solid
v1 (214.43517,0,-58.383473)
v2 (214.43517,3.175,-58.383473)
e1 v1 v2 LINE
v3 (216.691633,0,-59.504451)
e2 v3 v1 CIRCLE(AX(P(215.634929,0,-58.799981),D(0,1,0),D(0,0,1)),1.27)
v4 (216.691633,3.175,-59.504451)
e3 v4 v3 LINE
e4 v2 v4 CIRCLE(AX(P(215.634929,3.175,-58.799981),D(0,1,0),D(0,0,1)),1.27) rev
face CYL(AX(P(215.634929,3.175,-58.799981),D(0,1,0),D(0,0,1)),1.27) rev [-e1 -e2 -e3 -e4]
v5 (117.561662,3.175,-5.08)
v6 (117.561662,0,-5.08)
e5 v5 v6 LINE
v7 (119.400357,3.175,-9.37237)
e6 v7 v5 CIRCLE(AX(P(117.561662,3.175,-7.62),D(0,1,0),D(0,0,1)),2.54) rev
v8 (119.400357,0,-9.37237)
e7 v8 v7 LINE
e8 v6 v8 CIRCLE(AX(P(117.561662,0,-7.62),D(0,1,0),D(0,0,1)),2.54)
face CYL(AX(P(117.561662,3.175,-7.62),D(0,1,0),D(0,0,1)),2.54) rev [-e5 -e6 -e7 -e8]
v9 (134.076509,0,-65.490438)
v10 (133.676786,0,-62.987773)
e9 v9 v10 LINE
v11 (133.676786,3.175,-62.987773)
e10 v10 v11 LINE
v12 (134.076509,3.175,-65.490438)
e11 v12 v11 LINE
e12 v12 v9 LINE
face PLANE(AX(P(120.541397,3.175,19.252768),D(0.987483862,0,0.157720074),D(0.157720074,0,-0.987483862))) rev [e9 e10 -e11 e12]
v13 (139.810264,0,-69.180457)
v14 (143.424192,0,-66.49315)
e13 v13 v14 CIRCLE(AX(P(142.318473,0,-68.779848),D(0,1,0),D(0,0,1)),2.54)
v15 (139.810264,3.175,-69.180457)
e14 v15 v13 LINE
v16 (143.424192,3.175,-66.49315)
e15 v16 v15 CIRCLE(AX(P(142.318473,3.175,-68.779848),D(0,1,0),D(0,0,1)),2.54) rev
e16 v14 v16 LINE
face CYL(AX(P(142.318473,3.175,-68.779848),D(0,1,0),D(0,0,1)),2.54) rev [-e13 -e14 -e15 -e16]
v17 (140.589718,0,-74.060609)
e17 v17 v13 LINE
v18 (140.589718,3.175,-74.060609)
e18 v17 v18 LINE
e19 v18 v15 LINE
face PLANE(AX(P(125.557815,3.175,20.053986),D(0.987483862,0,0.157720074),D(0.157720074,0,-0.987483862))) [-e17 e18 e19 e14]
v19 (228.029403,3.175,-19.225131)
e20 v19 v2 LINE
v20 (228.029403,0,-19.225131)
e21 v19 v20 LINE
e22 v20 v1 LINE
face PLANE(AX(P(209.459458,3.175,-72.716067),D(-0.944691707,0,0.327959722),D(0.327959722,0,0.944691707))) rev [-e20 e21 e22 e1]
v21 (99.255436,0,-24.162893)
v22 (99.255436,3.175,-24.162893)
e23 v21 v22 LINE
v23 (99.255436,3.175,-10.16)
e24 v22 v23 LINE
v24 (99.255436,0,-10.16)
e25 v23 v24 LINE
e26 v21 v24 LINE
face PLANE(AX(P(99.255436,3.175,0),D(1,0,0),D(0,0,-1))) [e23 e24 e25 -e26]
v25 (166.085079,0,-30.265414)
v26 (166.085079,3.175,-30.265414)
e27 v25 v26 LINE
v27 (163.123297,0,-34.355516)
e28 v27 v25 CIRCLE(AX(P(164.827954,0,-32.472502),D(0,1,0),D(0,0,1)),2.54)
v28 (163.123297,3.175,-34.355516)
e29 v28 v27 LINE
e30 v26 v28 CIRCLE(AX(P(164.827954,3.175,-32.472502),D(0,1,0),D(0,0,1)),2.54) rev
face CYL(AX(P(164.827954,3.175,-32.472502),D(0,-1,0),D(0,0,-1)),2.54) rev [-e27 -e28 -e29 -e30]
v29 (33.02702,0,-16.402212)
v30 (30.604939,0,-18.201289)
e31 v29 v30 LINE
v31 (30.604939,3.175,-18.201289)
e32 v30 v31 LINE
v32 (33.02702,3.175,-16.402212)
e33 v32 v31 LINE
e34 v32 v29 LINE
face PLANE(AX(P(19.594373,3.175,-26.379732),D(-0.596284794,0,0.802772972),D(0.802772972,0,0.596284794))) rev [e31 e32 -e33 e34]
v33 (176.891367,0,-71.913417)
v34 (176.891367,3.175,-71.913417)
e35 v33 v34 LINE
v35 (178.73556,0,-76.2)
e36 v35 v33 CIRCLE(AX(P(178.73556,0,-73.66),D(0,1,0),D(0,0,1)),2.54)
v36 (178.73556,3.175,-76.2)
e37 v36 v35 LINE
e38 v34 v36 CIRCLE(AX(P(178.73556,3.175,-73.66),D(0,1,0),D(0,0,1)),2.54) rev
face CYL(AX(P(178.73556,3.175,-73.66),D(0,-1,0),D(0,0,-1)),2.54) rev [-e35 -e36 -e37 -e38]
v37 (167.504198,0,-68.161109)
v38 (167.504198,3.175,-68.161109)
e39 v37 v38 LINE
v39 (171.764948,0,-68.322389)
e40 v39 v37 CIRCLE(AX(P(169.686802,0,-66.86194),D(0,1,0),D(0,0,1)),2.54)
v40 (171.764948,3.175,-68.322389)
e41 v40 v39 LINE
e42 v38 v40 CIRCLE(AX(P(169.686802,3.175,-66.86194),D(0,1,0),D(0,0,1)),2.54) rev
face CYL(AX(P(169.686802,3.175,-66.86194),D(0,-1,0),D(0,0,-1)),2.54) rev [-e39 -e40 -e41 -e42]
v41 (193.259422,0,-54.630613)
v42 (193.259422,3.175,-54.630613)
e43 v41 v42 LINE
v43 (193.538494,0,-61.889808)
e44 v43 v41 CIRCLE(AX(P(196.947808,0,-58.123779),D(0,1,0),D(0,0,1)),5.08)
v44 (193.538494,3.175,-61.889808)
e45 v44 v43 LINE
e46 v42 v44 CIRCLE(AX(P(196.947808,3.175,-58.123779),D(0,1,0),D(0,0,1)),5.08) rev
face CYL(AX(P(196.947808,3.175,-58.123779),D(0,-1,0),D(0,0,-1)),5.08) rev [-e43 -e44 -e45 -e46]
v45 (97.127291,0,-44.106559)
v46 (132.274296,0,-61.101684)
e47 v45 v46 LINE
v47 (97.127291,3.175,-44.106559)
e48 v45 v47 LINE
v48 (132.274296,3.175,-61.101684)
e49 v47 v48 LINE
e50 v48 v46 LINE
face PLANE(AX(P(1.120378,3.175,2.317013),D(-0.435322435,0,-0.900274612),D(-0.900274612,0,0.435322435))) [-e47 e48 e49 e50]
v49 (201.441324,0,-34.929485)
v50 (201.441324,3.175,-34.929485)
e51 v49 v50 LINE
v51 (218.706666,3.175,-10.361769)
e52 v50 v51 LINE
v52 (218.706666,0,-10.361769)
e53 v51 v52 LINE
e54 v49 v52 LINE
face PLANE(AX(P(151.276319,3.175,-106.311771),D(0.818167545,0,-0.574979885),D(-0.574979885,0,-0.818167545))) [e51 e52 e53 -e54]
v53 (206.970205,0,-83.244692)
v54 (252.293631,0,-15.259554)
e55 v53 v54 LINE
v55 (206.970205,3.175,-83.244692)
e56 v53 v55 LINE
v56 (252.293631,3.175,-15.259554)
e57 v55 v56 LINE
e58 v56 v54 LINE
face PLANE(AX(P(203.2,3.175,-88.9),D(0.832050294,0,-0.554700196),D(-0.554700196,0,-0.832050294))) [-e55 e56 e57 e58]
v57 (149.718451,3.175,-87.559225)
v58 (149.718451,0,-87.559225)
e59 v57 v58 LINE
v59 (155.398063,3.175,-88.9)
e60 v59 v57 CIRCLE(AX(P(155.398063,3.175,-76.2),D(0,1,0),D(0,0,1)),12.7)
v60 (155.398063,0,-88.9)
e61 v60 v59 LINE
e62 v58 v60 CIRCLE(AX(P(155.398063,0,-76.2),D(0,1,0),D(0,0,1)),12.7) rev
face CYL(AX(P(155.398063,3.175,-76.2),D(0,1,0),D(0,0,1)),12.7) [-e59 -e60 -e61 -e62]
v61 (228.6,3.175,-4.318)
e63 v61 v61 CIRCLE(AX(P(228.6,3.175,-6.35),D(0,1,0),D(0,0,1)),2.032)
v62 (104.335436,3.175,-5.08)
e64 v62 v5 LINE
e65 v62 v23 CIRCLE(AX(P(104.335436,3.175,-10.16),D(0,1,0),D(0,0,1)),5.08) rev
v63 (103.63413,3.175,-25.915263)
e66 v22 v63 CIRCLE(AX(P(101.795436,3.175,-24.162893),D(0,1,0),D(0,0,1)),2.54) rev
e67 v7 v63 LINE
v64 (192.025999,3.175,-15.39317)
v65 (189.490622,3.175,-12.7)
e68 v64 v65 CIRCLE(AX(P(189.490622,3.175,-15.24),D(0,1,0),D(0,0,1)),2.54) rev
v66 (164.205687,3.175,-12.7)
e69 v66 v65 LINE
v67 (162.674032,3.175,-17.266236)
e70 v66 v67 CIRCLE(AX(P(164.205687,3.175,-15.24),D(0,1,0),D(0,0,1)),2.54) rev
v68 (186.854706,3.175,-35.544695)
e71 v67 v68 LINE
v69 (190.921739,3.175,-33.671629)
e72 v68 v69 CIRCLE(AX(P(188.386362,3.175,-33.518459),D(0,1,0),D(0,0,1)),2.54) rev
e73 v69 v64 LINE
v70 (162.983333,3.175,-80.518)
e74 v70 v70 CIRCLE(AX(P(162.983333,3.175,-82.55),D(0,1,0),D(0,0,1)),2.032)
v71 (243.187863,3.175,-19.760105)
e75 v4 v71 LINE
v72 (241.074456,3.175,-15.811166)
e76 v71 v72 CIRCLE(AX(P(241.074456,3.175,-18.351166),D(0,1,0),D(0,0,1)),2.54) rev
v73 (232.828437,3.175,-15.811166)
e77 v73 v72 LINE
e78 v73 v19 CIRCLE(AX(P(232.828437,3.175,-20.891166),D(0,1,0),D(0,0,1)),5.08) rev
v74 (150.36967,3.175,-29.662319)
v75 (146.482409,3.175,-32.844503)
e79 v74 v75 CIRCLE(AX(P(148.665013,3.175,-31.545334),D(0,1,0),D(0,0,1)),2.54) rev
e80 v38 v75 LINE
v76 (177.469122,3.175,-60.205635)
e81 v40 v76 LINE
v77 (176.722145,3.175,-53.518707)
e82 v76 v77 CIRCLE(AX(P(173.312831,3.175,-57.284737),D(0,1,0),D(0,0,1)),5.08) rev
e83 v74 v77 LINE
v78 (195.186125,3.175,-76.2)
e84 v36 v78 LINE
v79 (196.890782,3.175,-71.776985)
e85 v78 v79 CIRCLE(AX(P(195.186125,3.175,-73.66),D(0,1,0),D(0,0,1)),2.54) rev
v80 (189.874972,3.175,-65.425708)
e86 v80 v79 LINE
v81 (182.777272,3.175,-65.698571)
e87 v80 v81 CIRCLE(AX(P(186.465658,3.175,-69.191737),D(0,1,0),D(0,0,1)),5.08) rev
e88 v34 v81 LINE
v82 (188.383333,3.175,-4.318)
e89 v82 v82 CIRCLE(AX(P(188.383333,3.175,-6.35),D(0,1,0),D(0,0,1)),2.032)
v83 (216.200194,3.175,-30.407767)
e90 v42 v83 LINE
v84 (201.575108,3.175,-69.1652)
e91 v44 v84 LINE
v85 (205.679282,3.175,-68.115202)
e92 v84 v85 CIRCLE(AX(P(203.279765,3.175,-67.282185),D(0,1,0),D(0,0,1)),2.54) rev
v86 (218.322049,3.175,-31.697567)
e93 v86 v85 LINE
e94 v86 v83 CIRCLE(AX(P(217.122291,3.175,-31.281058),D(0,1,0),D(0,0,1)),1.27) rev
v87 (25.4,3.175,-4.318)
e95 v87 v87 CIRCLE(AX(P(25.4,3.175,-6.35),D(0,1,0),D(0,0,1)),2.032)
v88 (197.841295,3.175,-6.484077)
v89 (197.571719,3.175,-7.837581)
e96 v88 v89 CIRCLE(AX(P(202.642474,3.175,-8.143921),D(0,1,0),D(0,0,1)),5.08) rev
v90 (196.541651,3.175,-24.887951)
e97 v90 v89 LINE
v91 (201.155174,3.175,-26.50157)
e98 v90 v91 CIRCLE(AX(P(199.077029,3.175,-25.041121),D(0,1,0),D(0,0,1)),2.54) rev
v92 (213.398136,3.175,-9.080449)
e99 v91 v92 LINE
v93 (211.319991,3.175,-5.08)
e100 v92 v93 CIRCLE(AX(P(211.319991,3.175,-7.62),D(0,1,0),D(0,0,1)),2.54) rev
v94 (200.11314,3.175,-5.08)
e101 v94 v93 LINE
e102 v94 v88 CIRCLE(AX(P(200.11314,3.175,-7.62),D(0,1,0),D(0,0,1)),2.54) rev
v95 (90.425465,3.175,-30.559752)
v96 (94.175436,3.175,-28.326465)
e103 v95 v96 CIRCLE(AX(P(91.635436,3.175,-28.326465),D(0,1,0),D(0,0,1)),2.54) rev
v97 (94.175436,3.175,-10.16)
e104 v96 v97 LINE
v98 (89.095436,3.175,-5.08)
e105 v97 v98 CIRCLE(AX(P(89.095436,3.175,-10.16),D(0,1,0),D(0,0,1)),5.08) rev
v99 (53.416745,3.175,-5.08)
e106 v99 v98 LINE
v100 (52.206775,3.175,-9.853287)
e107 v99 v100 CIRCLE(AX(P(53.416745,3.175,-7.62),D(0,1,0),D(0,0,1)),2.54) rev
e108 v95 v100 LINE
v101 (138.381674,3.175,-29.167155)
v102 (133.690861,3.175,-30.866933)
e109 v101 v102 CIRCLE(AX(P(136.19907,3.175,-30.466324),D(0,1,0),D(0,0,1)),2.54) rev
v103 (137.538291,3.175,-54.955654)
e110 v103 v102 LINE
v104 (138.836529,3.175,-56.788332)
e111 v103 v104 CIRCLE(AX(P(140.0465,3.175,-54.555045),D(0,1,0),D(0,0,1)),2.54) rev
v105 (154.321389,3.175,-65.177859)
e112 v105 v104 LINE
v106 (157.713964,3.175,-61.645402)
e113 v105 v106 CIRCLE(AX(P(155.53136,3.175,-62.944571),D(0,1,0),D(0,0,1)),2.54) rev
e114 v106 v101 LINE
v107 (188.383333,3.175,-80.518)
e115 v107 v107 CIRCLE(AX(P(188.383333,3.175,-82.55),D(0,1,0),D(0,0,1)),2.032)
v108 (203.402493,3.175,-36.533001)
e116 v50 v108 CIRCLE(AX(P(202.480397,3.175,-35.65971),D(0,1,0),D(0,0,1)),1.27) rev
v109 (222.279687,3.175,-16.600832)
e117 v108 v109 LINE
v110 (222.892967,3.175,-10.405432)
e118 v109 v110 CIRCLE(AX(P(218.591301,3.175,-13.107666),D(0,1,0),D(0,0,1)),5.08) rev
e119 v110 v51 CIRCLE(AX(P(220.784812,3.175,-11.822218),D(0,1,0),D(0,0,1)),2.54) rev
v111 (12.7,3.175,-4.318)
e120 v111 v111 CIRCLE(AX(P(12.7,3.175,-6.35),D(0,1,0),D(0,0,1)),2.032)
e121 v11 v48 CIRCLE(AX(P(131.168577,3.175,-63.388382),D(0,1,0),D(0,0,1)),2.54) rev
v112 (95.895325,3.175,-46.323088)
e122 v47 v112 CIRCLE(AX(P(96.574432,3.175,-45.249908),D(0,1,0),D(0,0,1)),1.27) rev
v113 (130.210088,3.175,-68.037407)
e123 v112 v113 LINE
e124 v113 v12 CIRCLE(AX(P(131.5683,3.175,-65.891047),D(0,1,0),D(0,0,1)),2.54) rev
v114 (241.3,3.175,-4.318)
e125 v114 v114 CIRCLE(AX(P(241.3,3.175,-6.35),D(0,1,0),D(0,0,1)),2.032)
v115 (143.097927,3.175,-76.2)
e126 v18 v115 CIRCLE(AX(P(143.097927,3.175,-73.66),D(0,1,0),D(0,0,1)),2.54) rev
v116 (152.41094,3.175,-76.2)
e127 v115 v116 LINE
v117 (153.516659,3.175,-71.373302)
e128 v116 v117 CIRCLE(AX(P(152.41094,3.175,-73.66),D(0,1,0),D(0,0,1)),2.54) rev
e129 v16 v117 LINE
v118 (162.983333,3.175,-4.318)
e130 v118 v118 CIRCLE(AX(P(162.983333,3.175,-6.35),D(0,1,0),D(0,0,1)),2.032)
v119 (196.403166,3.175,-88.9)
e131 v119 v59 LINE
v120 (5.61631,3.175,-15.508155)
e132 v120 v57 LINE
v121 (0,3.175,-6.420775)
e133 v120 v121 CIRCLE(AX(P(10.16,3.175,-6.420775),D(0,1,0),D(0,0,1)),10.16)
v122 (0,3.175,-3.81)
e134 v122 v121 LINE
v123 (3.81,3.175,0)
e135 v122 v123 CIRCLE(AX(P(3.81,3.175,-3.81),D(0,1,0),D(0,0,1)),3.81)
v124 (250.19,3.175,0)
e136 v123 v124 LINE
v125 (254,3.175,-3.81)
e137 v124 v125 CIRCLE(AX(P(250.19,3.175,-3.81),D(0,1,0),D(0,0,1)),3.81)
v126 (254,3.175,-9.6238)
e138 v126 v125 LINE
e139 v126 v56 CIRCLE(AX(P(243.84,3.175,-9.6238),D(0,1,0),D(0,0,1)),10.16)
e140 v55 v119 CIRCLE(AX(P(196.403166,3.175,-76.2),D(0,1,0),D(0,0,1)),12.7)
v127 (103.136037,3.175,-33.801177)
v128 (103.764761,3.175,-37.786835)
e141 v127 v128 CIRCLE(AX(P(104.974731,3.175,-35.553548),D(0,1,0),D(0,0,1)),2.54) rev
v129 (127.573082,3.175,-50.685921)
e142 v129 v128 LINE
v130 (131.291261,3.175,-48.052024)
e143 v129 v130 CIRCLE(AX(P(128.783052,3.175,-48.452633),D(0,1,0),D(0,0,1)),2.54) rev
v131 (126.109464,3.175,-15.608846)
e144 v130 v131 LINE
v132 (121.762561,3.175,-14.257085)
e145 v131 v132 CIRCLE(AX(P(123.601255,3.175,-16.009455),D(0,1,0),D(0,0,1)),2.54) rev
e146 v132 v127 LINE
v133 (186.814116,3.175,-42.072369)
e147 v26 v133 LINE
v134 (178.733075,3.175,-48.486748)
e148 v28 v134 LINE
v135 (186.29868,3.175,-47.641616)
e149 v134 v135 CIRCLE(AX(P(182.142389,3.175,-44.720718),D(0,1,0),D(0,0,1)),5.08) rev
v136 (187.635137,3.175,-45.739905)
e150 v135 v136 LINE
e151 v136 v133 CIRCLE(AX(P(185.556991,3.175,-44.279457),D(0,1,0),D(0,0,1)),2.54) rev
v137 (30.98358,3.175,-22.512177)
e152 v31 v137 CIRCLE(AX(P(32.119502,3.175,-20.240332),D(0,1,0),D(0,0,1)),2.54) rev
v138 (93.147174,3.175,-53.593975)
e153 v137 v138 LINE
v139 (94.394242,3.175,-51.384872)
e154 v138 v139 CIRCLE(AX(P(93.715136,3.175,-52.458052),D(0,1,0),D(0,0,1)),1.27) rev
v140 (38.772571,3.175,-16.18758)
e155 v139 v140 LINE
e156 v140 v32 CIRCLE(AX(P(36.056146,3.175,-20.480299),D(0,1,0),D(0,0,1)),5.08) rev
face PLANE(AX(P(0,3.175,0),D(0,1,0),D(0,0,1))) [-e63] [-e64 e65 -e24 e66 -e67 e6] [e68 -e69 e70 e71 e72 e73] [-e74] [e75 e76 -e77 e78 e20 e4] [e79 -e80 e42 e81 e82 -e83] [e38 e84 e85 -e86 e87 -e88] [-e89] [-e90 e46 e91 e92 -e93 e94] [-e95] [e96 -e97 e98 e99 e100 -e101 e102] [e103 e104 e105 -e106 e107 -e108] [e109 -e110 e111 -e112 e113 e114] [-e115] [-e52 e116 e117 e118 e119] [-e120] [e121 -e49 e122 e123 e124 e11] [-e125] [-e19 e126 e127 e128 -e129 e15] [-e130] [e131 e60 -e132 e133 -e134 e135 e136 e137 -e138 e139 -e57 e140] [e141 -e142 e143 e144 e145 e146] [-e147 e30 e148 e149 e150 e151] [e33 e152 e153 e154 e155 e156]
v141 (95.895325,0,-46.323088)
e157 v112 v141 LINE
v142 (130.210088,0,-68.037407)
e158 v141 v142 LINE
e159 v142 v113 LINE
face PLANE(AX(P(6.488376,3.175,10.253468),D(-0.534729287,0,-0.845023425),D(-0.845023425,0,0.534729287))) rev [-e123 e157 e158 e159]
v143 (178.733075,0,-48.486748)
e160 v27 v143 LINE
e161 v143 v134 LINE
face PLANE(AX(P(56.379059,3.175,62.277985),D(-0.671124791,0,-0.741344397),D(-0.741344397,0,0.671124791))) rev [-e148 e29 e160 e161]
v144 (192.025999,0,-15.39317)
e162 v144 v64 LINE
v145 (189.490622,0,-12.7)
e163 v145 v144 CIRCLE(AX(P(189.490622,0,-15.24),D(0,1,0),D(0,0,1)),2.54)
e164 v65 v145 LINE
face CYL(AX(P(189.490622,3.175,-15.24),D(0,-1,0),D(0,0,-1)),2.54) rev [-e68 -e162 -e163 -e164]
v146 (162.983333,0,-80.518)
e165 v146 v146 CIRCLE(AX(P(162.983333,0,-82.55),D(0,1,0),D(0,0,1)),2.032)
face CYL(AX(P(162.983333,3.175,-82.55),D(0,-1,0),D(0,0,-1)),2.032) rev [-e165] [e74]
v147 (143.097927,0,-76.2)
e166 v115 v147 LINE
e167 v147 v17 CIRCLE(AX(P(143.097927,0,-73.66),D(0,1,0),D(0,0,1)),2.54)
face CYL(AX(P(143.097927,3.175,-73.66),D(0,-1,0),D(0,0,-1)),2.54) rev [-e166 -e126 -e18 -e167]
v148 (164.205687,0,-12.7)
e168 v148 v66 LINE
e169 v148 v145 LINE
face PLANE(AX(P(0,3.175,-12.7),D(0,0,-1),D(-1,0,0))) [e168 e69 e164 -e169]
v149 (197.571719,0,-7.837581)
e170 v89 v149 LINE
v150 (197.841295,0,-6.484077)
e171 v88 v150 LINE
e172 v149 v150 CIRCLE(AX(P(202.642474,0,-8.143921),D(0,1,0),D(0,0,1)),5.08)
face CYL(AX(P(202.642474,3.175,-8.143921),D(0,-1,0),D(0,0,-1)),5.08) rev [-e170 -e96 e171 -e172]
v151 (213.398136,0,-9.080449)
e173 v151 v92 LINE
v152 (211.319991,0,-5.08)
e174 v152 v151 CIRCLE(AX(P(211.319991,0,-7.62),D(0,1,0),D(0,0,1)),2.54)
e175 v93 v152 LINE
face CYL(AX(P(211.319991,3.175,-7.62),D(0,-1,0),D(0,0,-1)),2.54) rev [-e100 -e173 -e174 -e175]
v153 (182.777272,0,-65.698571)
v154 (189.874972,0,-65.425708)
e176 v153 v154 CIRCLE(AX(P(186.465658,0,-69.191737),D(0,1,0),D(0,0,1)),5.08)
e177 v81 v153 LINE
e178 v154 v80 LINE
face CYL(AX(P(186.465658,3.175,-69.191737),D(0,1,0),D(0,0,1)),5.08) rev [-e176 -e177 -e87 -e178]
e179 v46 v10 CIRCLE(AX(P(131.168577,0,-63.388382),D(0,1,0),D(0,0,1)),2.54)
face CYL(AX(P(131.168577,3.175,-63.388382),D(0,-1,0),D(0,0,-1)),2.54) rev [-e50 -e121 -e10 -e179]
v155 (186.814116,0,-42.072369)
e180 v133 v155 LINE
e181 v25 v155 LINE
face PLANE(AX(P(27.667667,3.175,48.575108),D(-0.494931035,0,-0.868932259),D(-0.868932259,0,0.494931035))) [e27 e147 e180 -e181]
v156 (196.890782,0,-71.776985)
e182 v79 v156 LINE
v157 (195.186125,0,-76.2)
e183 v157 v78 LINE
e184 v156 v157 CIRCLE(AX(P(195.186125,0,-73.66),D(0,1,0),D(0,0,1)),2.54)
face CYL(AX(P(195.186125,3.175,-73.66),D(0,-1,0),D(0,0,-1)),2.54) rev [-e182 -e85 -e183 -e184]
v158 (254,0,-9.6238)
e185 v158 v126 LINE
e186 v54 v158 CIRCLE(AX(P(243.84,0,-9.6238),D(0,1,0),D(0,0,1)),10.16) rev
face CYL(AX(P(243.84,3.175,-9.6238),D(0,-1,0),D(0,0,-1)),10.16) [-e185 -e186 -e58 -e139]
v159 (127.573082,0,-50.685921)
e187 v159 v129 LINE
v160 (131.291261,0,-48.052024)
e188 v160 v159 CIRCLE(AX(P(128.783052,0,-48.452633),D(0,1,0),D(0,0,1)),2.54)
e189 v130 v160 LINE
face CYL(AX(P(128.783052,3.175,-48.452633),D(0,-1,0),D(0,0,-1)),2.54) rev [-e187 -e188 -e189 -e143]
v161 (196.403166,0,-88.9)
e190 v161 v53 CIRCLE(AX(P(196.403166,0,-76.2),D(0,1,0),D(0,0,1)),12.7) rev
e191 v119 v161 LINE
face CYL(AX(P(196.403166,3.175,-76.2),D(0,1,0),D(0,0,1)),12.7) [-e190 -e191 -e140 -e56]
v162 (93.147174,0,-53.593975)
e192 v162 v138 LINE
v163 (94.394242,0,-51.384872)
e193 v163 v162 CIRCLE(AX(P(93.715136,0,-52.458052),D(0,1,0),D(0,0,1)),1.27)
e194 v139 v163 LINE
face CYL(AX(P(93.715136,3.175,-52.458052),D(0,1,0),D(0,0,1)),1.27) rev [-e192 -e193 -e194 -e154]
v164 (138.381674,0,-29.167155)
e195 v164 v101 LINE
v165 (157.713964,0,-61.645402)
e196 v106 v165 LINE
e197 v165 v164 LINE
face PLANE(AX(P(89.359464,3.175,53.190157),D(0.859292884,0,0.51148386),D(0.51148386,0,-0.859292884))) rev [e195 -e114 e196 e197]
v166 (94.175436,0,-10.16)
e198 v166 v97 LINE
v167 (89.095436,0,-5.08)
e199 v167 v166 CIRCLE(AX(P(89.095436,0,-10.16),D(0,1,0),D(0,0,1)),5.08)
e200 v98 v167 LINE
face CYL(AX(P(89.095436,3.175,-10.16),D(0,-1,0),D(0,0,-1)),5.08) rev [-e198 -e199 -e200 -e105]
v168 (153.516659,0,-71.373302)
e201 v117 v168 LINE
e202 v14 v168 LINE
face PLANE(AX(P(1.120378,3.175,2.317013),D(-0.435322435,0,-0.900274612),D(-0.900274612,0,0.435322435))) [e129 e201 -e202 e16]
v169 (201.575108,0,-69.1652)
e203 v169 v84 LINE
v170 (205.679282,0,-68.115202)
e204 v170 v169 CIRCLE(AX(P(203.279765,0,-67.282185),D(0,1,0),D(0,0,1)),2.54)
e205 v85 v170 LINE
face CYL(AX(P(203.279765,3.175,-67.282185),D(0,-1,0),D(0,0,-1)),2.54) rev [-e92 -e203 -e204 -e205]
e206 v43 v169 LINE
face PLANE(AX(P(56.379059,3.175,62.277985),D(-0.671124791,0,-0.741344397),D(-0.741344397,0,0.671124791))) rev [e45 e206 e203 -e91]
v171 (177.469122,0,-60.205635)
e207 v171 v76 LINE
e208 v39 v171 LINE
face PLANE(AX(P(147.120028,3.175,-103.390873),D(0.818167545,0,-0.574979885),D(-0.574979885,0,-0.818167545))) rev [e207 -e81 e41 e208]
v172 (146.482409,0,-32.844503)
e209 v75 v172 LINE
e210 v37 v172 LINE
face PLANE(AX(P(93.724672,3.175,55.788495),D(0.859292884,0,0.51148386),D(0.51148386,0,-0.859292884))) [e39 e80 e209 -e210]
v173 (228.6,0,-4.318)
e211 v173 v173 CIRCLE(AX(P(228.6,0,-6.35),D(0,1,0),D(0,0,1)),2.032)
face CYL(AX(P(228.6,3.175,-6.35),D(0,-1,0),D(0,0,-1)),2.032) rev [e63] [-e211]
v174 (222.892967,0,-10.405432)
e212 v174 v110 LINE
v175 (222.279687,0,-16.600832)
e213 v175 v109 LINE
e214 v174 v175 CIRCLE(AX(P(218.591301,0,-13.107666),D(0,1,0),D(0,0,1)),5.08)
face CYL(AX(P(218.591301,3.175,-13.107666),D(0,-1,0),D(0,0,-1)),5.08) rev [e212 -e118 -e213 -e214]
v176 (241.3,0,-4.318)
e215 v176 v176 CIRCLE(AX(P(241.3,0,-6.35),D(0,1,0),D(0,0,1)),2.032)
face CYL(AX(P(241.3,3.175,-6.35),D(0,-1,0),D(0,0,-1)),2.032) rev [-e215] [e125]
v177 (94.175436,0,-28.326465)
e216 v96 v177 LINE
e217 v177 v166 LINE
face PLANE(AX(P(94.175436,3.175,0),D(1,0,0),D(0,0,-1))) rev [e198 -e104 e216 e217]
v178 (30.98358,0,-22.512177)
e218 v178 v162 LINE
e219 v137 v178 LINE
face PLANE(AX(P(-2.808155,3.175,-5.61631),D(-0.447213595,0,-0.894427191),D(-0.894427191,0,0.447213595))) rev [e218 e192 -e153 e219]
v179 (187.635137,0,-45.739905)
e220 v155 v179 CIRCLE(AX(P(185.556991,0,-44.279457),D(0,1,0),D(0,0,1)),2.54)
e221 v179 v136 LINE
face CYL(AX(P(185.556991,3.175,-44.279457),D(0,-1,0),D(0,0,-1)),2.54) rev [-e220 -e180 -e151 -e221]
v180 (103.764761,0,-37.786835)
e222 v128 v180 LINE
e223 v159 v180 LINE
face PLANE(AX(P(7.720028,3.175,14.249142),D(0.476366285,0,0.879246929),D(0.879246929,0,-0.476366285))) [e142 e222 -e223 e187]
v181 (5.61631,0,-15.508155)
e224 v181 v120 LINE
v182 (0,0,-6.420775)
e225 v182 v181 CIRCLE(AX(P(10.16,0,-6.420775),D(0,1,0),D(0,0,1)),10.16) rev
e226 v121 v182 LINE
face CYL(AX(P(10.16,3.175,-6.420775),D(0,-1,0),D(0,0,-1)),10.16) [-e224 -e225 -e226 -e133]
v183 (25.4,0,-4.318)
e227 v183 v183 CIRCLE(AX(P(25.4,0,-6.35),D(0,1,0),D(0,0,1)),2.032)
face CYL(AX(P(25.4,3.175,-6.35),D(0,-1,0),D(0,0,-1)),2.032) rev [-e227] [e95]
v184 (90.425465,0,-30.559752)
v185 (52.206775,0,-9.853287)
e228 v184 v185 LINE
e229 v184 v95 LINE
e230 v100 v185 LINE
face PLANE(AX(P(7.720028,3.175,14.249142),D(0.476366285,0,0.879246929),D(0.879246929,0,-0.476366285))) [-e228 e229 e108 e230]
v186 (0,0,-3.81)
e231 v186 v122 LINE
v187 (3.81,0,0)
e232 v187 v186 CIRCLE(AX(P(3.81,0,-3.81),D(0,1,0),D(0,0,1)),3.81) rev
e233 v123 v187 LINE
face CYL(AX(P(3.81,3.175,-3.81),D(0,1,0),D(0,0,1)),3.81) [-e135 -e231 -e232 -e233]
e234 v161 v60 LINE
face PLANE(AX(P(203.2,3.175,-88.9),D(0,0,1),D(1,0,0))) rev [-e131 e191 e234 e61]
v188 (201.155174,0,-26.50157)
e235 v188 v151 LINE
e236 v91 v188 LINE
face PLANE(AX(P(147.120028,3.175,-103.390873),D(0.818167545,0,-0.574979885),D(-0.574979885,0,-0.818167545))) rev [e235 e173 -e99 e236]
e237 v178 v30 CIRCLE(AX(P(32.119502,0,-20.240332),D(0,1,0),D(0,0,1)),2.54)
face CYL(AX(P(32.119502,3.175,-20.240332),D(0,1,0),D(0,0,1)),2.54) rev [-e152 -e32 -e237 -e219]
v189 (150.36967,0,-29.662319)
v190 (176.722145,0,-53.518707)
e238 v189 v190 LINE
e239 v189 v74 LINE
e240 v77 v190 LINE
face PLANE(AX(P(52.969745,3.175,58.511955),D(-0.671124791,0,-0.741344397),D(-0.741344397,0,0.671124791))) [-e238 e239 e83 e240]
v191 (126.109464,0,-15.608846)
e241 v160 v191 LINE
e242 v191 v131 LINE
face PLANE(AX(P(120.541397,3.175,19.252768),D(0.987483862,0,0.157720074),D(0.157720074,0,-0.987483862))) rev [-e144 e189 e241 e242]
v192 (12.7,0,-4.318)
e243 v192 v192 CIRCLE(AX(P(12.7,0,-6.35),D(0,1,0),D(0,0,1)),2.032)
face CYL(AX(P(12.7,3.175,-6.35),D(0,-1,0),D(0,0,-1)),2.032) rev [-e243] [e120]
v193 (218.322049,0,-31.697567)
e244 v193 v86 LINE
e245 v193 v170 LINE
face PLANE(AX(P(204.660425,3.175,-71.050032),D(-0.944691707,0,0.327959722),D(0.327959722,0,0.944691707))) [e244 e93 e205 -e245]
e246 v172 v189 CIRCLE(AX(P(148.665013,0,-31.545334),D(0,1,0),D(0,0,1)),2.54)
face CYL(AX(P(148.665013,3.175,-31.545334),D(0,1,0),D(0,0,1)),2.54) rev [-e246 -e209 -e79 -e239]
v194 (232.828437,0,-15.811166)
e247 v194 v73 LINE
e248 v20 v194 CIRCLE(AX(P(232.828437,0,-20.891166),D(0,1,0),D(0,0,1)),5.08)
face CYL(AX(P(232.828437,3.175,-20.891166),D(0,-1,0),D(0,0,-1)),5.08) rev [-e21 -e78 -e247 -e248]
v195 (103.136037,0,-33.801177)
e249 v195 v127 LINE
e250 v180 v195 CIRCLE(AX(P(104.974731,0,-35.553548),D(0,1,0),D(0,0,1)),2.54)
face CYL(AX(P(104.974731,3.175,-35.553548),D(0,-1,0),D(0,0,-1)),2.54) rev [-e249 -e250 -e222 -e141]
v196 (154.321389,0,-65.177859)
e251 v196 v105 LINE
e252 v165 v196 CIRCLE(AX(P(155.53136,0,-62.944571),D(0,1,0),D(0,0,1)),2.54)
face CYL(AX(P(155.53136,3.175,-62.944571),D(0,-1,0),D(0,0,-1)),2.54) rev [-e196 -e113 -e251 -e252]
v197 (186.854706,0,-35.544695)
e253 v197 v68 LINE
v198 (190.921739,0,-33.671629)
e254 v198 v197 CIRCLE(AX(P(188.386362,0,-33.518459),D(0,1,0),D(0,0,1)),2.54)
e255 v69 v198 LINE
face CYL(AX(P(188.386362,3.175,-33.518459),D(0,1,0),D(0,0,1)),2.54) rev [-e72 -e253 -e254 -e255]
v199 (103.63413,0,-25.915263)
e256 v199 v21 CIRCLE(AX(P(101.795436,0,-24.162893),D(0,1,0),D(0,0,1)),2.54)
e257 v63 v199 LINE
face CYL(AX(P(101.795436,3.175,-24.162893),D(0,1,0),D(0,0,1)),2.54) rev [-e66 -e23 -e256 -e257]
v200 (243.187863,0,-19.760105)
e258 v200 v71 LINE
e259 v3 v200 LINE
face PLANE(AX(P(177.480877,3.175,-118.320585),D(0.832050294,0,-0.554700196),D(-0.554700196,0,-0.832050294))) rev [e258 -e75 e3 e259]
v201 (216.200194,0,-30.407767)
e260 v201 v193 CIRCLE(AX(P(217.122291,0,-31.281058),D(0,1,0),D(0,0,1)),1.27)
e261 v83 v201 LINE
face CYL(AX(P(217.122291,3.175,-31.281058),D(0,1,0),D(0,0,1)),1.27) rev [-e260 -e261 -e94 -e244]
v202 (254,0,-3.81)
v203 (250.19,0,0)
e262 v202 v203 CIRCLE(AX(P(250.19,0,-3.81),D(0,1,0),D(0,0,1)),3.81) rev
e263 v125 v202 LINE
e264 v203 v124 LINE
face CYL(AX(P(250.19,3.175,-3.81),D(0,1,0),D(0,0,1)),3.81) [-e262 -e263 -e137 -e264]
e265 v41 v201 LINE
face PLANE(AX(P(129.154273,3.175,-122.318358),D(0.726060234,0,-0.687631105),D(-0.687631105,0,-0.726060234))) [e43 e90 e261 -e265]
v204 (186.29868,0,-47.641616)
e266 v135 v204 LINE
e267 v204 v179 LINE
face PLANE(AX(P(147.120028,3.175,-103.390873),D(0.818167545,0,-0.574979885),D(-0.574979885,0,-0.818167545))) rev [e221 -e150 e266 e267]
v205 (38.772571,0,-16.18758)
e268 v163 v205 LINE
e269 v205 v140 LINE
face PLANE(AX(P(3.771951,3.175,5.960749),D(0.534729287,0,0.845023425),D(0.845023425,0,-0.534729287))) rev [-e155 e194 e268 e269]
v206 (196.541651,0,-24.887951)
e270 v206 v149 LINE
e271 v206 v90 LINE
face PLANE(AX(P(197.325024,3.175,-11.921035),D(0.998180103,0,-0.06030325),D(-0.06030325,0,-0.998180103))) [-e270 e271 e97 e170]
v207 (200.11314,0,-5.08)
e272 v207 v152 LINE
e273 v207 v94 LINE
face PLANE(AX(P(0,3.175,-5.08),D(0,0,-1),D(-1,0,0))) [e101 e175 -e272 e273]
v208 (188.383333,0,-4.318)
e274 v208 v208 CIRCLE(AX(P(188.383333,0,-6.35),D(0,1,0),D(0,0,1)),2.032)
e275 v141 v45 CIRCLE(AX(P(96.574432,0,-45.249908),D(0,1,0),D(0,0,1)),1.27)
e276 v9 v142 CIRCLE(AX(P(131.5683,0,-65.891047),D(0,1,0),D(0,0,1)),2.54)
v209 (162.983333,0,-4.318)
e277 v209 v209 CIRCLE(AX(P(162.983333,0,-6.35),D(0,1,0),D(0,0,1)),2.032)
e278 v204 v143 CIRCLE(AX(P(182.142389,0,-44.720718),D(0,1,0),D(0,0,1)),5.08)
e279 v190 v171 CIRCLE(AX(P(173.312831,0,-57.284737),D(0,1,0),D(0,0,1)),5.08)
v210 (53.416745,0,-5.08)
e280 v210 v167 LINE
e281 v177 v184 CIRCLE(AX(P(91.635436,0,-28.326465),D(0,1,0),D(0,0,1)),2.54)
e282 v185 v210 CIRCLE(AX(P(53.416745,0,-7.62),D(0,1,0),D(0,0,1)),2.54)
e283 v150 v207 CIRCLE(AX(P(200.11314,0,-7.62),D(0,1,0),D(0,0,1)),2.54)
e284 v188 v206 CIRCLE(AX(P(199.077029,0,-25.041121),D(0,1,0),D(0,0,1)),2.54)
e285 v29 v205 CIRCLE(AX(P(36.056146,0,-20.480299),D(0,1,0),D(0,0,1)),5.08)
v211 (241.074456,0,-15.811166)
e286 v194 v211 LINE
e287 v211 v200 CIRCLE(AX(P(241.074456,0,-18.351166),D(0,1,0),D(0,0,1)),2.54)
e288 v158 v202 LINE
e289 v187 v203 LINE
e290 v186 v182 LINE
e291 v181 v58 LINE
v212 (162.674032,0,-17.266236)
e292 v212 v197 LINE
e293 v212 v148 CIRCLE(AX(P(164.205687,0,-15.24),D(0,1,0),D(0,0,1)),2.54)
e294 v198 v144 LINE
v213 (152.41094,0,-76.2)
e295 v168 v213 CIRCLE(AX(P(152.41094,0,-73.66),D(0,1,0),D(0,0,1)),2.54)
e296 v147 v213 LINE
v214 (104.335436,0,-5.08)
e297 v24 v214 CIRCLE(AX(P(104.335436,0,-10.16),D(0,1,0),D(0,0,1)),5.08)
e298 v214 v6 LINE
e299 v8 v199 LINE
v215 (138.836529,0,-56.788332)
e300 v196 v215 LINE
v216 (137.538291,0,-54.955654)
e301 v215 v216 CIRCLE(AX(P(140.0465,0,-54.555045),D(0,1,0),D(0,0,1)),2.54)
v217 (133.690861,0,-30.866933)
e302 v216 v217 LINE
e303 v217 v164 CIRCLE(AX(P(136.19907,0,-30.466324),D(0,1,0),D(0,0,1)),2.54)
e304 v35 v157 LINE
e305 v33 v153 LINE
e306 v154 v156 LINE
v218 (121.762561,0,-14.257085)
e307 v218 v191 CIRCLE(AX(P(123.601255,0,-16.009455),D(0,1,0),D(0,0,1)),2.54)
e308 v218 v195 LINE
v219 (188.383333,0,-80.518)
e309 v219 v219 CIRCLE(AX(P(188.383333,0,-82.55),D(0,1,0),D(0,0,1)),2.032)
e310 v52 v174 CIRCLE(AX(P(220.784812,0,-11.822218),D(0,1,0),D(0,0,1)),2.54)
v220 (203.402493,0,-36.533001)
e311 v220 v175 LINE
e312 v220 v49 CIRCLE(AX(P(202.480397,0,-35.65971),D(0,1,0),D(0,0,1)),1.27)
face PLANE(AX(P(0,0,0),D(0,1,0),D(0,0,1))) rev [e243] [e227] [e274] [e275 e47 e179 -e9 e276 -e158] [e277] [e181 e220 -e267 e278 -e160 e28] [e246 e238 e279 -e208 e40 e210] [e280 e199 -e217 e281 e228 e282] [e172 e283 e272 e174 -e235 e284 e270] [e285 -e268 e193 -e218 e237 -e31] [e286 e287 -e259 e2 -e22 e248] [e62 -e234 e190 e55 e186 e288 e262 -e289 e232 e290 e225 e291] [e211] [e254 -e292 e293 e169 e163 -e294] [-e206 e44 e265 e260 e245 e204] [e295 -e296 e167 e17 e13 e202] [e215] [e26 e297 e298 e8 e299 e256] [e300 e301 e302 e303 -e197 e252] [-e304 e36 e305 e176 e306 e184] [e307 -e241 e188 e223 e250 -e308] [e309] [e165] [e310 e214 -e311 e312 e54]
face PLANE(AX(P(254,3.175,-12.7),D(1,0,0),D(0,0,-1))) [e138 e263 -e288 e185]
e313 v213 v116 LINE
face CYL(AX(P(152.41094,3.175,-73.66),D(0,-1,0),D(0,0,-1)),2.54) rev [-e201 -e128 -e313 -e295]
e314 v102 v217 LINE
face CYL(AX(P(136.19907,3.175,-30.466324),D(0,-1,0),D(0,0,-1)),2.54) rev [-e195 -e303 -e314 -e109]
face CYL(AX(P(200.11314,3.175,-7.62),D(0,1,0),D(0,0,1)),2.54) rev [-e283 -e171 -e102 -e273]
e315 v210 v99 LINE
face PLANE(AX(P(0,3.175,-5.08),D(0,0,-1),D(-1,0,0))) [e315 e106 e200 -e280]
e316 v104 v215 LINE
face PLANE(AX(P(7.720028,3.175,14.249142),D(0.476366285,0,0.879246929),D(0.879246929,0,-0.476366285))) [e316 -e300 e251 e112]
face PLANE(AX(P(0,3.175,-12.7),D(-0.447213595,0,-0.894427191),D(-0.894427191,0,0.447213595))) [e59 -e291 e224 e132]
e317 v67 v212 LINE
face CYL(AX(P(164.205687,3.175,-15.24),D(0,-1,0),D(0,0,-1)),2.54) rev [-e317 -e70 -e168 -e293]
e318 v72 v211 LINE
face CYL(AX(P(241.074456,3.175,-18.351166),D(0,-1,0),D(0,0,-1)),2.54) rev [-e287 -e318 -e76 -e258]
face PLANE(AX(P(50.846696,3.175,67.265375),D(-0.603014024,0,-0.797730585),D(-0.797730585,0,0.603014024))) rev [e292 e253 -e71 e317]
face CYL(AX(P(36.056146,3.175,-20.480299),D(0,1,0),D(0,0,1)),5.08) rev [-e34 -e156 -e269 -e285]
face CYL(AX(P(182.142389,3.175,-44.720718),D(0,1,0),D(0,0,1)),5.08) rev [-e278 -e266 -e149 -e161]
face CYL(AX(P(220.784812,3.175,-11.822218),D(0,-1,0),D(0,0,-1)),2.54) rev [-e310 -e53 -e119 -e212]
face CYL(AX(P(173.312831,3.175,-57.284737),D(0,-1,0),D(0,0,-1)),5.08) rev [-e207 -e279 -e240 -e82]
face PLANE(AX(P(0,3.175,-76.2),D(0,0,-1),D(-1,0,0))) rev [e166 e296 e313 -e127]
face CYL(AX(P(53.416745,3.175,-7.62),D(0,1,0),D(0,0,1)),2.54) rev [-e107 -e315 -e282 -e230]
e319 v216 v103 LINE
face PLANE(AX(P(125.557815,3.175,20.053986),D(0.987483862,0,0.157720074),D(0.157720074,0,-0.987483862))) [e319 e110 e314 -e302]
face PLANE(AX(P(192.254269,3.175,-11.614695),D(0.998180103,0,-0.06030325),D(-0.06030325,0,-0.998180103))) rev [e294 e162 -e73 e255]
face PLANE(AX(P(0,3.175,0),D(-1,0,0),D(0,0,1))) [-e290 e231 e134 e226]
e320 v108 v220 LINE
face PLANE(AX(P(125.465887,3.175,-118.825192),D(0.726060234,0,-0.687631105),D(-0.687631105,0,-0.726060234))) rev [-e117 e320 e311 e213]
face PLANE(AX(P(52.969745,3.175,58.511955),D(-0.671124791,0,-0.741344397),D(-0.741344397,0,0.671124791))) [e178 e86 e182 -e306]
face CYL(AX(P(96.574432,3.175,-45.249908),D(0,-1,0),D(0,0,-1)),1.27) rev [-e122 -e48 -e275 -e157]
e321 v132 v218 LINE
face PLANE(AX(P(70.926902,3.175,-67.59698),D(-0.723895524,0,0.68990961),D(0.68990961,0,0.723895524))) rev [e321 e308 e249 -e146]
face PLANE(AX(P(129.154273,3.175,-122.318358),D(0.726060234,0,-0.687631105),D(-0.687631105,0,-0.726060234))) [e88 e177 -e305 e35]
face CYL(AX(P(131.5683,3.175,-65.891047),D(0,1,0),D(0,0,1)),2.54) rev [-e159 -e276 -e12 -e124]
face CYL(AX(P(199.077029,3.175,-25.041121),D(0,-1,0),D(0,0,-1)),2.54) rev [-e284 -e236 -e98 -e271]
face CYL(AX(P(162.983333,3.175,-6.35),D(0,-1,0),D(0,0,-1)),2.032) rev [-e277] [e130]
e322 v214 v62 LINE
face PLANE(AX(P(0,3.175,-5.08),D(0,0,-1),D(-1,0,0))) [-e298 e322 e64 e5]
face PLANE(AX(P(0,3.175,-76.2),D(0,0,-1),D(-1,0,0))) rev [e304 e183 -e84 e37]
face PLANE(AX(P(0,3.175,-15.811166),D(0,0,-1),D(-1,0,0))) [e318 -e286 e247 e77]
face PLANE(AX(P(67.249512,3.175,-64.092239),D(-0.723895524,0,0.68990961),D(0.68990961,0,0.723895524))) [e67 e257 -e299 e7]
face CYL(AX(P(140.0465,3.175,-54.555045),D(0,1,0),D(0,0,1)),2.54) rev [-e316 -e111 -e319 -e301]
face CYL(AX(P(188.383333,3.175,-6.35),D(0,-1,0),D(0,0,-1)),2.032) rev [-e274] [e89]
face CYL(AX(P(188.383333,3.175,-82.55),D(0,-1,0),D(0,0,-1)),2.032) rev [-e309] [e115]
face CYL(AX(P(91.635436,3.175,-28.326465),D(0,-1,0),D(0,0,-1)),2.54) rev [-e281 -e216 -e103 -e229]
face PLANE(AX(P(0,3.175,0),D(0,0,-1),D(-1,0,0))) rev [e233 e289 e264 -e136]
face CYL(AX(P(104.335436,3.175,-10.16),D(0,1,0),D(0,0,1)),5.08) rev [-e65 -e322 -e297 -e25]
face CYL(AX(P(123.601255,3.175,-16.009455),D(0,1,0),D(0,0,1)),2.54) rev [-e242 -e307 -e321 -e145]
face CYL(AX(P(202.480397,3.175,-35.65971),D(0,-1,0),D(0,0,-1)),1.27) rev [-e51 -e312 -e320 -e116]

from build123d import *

# Parameters (mm, degrees)
SKETCH1_R           = 2.032
BOSS_EXTRUDE1_DEPTH = 3.175
SKETCH1_3_R         = 2.032
CUT_EXTRUDE2_DEPTH  = 270.126904313
FILLET1_R           = 3.81
FILLET2_R           = 10.16
FILLET3_R           = 12.7
FILLET4_R           = 1.27
FILLET5_R           = 2.54
FILLET6_DEPTH       = 3.175


with BuildPart() as part:
    # Sketch1 → Boss-Extrude1 (new body)
    with BuildSketch(Plane(origin=(0, 0, 0), x_dir=(1, 0, 0), z_dir=(0, 1, 0))):
        Polygon((0, 0), (254, 0), (254, 12.7), (203.2, 88.9), (152.4, 88.9), (0, 12.7), align=None)
        with Locations(Location((12.7, 6.35, 0), (0, 0, 270))):
            Circle(SKETCH1_R, mode=Mode.SUBTRACT)
        with Locations(Location((25.4, 6.35, 0), (0, 0, 270))):
            Circle(SKETCH1_R, mode=Mode.SUBTRACT)
        with Locations(Location((228.6, 6.35, 0), (0, 0, 270))):
            Circle(SKETCH1_R, mode=Mode.SUBTRACT)
        with Locations(Location((241.3, 6.35, 0), (0, 0, 270))):
            Circle(SKETCH1_R, mode=Mode.SUBTRACT)
        with Locations(Location((162.983333333, 82.55, 0), (0, 0, 270))):
            Circle(SKETCH1_R, mode=Mode.SUBTRACT)
        with Locations(Location((188.383333333, 82.55, 0), (0, 0, 270))):
            Circle(SKETCH1_R, mode=Mode.SUBTRACT)
    extrude(amount=BOSS_EXTRUDE1_DEPTH)

    # Sketch1<3> → Cut-Extrude2 (cut, through all)
    with BuildSketch(Plane(origin=(0, 0, 0), x_dir=(1, 0, 0), z_dir=(0, 1, 0))):
        Polygon((115.724624488, 64.882699581), (27.28853263, 20.664653652), (35.82613579, 14.323081227), align=None)
        Polygon((197.627677458, 6.91131175), (198.543333333, 5.08), (216.209513725, 5.08), (196.001097378, 33.83556314), align=None)
        with Locations(Location((162.983333333, 6.35, 0), (0, 0, 270))):
            Circle(SKETCH1_3_R)
        Polygon((190.635905135, 38.402947882), (156.633333333, 12.7), (192.188702367, 12.7), align=None)
        Polygon((94.175435772, 32.591444541), (43.396541726, 5.08), (94.175435772, 5.08), align=None)
        with Locations(Location((188.383333333, 6.35, 0), (0, 0, 270))):
            Circle(SKETCH1_3_R)
        Polygon((99.255435772, 30.509658634), (99.255435772, 5.08), (123.491206376, 5.08), align=None)
        Polygon((163.49857777, 76.2), (140.931419259, 76.2), (139.042658246, 64.374485547), align=None)
        Polygon((191.431375489, 49.173139927), (220.831581656, 7.338120783), (225.073834238, 13.650530069), align=None)
        Polygon((182.993969781, 52.344053487), (145.913976972, 18.776250855), (189.241078693, 43.454730757), align=None)
        Polygon((134.963762863, 71.045523698), (77.053379688, 34.399938534), (133.467710225, 61.678752584), align=None)
        Polygon((229.214596962, 15.811166321), (245.82048896, 15.811166321), (211.171400328, 67.784799269), align=None)
        Polygon((132.104025549, 53.140736008), (100.845083482, 36.204986082), (125.300627654, 10.544727526), align=None)
        Polygon((169.510067662, 71.530970072), (137.832506287, 18.312666963), (180.050783748, 56.53205963), align=None)
        Polygon((186.192725225, 62.092240839), (201.77657544, 76.2), (172.831665677, 76.2), align=None)
        Polygon((162.432346465, 69.572285661), (137.735749394, 56.191941851), (131.599534907, 17.773162244), align=None)
        Polygon((189.686775345, 58.402921334), (220.256823492, 26.124427609), (204.420515632, 71.741092366), align=None)
    extrude(amount=CUT_EXTRUDE2_DEPTH, mode=Mode.SUBTRACT)

    # Fillet1
    fillet1_edges = [part.edges().sort_by_distance(p)[0] for p in [
        (0, 1.5875, 0),
        (254, 1.5875, 0),
    ]]
    fillet(fillet1_edges, radius=FILLET1_R)

    # Fillet2
    fillet2_edges = [part.edges().sort_by_distance(p)[0] for p in [
        (254, 1.5875, -12.7),
        (0, 1.5875, -12.7),
    ]]
    fillet(fillet2_edges, radius=FILLET2_R)

    # Fillet3
    fillet3_edges = [part.edges().sort_by_distance(p)[0] for p in [
        (203.2, 1.5875, -88.9),
        (152.4, 1.5875, -88.9),
    ]]
    fillet(fillet3_edges, radius=FILLET3_R)

    # Fillet4
    fillet4_edges = [part.edges().sort_by_distance(p)[0] for p in [
        (220.256823492, 1.5875, -26.124427609),
        (211.171400328, 1.5875, -67.784799269),
        (191.431375489, 1.5875, -49.173139927),
        (115.724624488, 1.5875, -64.882699581),
        (77.053379688, 1.5875, -34.399938534),
    ]]
    fillet(fillet4_edges, radius=FILLET4_R)

    # Fillet5
    fillet5_edges = [part.edges().sort_by_distance(p)[0] for p in [
        (172.831665677, 1.5875, -76.2),
        (204.420515632, 1.5875, -71.741092366),
        (131.599534907, 1.5875, -17.773162244),
        (162.432346465, 1.5875, -69.572285661),
        (137.735749394, 1.5875, -56.191941851),
        (169.510067662, 1.5875, -71.530970072),
        (137.832506287, 1.5875, -18.312666963),
        (196.001097378, 1.5875, -33.83556314),
        (198.543333333, 1.5875, -5.08),
        (216.209513725, 1.5875, -5.08),
        (145.913976972, 1.5875, -18.776250855),
        (189.241078693, 1.5875, -43.454730757),
        (245.82048896, 1.5875, -15.811166321),
        (220.831581656, 1.5875, -7.338120783),
        (94.175435772, 1.5875, -32.591444541),
        (43.396541726, 1.5875, -5.08),
        (27.28853263, 1.5875, -20.664653652),
        (140.931419259, 1.5875, -76.2),
        (139.042658246, 1.5875, -64.374485547),
        (163.49857777, 1.5875, -76.2),
        (134.963762863, 1.5875, -71.045523698),
        (133.467710225, 1.5875, -61.678752584),
        (123.491206376, 1.5875, -5.08),
        (99.255435772, 1.5875, -30.509658634),
        (125.300627654, 1.5875, -10.544727526),
        (132.104025549, 1.5875, -53.140736008),
        (100.845083482, 1.5875, -36.204986082),
        (190.635905135, 1.5875, -38.402947882),
        (156.633333333, 1.5875, -12.7),
        (192.188702367, 1.5875, -12.7),
        (201.77657544, 1.5875, -76.2),
    ]]
    fillet(fillet5_edges, radius=FILLET5_R)

    # Fillet6: read off the stored shape, not the designer's step
    # Fillet6 outline → Fillet6 (add)
    with BuildSketch(Plane(origin=(0, 0, 0), x_dir=(1, 0, 0), z_dir=(0, 1, 0))):
        with BuildLine():
            Line((197.627677458, 6.91131175), (197.8412946, 6.484077467))
            ThreePointArc((197.8412946, 6.484077467), (197.660329187, 7.15163193), (197.571718595, 7.837580619))
            Line((197.571718595, 7.837580619), (197.627677458, 6.91131175))
        make_face()
        with BuildLine():
            ThreePointArc((38.77257119, 16.18758019), (35.866508895, 15.403840031), (33.027019658, 16.402212494))
            Line((33.027019658, 16.402212494), (35.82613579, 14.323081227))
            Line((35.82613579, 14.323081227), (38.77257119, 16.18758019))
        make_face()
        with BuildLine():
            Line((229.214596962, 15.811166321), (232.828436892, 15.811166321))
            ThreePointArc((232.828436892, 15.811166321), (229.883700891, 16.751730382), (228.029403022, 19.225130932))
            Line((228.029403022, 19.225130932), (229.214596962, 15.811166321))
        make_face()
        with BuildLine():
            Line((225.073834238, 13.650530069), (222.279686918, 16.600831826))
            ThreePointArc((222.279686918, 16.600831826), (223.646593023, 13.608087476), (222.892967422, 10.405432406))
            Line((222.892967422, 10.405432406), (225.073834238, 13.650530069))
        make_face()
        with BuildLine():
            Line((94.175435772, 5.08), (94.175435772, 10.16))
            ThreePointArc((94.175435772, 10.16), (92.687538221, 6.567897552), (89.095435772, 5.08))
            Line((89.095435772, 5.08), (94.175435772, 5.08))
        make_face()
        with BuildLine():
            ThreePointArc((104.335435772, 5.08), (100.743333324, 6.567897552), (99.255435772, 10.16))
            Line((99.255435772, 10.16), (99.255435772, 5.08))
            Line((99.255435772, 5.08), (104.335435772, 5.08))
        make_face()
        with BuildLine():
            Line((189.686775345, 58.402921334), (193.259422183, 54.630612636))
            ThreePointArc((193.259422183, 54.630612636), (191.871557973, 58.31892969), (193.538494235, 61.889808188))
            Line((193.538494235, 61.889808188), (189.686775345, 58.402921334))
        make_face()
        with BuildLine():
            ThreePointArc((189.874971747, 65.425707626), (186.270506771, 64.115486966), (182.777271822, 65.69857115))
            Line((182.777271822, 65.69857115), (186.192725225, 62.092240839))
            Line((186.192725225, 62.092240839), (189.874971747, 65.425707626))
        make_face()
        with BuildLine():
            Line((180.050783748, 56.53205963), (177.469122224, 60.205634526))
            ThreePointArc((177.469122224, 60.205634526), (178.361429352, 56.720772492), (176.722145031, 53.518707171))
            Line((176.722145031, 53.518707171), (180.050783748, 56.53205963))
        make_face()
        with BuildLine():
            ThreePointArc((178.733075257, 48.486747819), (182.706353411, 49.769316538), (186.298680322, 47.641616097))
            Line((186.298680322, 47.641616097), (182.993969781, 52.344053487))
            Line((182.993969781, 52.344053487), (178.733075257, 48.486747819))
        make_face()
    extrude(amount=FILLET6_DEPTH)


solid = part.part
